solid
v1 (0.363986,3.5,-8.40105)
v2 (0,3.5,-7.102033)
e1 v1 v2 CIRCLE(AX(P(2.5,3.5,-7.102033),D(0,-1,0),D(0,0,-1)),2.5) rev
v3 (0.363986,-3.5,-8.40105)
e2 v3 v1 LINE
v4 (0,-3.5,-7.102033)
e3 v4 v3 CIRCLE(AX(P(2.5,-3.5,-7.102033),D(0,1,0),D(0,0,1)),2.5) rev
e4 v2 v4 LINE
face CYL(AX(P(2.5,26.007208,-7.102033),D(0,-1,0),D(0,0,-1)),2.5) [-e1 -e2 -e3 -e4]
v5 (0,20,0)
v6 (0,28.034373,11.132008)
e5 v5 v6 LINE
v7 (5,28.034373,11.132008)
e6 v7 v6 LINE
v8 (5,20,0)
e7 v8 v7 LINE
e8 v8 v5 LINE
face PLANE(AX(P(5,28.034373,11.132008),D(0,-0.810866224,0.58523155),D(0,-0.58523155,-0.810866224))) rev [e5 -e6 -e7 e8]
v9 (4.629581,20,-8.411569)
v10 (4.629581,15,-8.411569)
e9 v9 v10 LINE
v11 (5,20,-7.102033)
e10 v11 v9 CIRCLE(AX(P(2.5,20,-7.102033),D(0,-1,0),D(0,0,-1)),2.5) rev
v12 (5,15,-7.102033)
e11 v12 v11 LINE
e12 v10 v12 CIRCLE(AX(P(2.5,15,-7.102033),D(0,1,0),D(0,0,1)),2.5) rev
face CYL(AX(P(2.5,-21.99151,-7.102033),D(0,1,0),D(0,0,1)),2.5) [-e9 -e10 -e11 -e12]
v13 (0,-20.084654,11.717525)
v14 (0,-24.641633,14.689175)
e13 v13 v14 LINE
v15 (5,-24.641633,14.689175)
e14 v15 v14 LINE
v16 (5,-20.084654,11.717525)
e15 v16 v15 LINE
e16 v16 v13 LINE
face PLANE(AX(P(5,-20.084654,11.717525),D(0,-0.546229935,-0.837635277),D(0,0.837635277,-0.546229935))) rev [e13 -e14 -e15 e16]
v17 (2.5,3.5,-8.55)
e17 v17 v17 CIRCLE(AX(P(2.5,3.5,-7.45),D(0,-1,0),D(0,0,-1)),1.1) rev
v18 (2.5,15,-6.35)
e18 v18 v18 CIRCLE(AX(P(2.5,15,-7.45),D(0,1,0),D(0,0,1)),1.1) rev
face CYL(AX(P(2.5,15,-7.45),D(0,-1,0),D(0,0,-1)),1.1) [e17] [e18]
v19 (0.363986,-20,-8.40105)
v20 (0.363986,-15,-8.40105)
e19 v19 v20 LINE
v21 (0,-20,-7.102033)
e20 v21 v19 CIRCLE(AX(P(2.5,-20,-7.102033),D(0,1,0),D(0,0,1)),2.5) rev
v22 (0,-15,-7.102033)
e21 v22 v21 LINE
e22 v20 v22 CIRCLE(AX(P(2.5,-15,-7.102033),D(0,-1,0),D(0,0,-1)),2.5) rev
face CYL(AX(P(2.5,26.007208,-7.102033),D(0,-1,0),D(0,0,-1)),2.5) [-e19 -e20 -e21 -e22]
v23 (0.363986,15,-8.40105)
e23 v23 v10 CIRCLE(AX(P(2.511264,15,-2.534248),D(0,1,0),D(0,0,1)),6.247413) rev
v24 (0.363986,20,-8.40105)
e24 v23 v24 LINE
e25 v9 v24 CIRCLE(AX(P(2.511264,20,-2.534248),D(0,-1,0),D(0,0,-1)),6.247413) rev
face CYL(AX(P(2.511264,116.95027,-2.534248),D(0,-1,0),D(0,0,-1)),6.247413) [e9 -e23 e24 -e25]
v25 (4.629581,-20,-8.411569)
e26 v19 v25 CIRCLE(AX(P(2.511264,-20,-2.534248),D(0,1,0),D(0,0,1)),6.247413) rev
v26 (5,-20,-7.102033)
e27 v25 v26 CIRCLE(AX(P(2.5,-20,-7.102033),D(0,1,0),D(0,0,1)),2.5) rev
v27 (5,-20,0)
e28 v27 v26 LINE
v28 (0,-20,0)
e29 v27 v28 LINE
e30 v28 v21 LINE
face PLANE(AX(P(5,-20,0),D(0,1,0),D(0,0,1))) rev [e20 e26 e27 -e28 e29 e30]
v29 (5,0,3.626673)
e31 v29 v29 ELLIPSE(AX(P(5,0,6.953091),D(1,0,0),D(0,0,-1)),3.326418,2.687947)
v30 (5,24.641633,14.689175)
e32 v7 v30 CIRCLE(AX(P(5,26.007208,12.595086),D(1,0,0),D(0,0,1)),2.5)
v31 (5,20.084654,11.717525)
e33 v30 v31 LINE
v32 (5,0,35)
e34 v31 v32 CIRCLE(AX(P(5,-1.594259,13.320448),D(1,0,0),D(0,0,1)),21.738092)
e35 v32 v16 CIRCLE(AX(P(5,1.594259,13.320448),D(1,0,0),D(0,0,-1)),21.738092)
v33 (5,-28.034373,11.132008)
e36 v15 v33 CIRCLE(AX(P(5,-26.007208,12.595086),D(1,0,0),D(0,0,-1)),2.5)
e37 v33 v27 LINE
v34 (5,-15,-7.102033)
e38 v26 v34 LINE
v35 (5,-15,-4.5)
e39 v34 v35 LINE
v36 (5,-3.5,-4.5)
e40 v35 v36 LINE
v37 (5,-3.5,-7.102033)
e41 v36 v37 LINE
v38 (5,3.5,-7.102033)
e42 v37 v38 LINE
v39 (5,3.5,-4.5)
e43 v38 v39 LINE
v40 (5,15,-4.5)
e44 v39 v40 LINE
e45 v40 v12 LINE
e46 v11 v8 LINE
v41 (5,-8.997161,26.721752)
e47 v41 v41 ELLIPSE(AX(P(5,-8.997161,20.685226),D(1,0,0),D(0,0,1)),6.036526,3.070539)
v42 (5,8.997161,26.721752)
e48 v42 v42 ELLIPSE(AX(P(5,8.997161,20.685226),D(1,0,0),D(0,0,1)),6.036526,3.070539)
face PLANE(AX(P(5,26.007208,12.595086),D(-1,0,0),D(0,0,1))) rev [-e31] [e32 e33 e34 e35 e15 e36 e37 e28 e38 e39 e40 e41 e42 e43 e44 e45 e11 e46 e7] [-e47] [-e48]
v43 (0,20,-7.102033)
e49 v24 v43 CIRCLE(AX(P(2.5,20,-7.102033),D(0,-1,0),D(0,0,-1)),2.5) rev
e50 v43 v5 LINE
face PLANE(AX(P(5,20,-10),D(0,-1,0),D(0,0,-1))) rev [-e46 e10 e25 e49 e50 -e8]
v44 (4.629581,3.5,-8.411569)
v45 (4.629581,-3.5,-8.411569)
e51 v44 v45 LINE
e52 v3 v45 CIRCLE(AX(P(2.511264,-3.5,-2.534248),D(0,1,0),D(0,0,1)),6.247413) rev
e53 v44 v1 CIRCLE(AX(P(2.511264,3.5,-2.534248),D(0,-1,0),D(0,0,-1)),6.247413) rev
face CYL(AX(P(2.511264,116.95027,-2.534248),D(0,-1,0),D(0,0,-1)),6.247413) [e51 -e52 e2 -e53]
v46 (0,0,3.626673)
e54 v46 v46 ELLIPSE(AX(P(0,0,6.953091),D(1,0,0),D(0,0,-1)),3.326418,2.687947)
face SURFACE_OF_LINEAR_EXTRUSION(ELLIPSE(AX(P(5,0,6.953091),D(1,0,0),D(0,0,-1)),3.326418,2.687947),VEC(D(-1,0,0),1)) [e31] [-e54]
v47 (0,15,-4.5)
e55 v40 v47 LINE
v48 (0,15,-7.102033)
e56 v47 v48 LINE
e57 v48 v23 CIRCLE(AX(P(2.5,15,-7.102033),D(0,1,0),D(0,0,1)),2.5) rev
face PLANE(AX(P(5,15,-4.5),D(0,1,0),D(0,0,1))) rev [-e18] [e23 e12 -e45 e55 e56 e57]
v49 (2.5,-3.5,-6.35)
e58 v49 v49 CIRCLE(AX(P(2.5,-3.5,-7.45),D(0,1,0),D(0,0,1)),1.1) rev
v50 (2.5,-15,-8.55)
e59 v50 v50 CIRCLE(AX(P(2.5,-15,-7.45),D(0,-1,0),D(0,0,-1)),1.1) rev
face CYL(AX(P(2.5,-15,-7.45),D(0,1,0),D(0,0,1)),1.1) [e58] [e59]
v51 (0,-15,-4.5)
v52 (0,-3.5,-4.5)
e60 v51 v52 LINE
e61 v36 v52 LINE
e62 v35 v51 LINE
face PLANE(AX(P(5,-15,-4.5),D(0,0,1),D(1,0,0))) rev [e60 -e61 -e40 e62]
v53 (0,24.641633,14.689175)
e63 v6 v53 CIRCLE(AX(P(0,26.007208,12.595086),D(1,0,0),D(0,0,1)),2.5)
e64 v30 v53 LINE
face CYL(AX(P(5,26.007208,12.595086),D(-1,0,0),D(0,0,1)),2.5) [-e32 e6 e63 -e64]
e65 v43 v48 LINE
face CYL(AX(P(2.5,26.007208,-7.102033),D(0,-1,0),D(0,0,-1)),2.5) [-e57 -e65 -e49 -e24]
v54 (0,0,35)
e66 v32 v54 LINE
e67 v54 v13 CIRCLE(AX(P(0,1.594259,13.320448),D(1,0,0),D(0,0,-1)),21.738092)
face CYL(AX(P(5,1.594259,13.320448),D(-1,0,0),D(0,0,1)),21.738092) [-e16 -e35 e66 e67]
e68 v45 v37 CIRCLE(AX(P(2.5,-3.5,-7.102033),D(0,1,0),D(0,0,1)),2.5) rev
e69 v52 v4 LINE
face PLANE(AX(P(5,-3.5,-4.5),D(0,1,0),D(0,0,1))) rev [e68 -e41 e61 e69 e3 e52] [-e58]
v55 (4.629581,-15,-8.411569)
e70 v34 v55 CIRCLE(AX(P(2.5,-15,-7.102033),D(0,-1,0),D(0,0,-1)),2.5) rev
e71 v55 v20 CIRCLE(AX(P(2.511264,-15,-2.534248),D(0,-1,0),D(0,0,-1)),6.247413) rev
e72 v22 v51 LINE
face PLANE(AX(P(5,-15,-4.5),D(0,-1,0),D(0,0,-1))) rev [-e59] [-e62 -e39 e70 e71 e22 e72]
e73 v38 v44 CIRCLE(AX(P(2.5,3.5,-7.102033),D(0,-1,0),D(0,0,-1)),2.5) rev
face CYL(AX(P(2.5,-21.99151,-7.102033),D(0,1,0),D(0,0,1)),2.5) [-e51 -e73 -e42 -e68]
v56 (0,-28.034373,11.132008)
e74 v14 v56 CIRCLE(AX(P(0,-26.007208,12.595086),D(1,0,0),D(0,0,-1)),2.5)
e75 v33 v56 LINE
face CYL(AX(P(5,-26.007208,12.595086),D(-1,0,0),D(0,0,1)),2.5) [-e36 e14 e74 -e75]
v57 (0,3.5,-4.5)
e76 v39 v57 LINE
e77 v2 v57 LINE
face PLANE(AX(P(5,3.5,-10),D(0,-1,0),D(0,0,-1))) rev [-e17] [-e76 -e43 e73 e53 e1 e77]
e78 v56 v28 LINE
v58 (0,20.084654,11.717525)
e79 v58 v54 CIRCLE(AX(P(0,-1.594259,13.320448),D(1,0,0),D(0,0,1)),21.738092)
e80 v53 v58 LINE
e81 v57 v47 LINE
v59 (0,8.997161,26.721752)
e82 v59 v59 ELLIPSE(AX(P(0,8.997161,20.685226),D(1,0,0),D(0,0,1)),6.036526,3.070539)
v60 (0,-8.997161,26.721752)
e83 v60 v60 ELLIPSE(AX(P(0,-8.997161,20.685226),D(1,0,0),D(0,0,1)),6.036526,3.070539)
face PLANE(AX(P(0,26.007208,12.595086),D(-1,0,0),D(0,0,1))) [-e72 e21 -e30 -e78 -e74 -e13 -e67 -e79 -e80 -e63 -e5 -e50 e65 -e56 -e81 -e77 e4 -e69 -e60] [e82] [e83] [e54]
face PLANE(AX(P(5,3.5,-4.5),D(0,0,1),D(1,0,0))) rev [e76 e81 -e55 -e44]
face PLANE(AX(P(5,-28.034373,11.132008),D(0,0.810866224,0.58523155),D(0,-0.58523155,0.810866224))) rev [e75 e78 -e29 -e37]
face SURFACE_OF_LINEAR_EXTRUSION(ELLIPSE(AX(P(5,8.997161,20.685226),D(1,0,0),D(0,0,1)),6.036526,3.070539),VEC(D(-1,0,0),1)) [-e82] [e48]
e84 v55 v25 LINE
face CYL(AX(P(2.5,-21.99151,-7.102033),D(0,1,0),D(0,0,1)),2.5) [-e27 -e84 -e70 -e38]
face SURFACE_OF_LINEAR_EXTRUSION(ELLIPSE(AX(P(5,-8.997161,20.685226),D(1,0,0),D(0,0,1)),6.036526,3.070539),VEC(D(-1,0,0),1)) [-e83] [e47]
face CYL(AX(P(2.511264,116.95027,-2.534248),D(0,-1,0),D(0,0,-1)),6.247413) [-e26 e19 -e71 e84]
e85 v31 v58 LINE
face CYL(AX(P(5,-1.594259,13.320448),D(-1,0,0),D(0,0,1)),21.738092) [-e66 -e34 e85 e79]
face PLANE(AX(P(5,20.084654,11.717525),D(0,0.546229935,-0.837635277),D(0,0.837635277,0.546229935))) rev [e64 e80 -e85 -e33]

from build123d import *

# Parameters (mm, degrees)
CROQUIS1_RX                = 6.036526162
CROQUIS1_RY                = 3.070539463
CROQUIS1_RX_2              = 3.326417752
CROQUIS1_RY_2              = 2.687947262
SALIENTE_EXTRUIR2_DEPTH    = 5
CROQUIS7_W                 = 42.690533415
CROQUIS7_H                 = 0.890099334
CORTAR_EXTRUIR1_DEPTH      = 10
REDONDEO1_R                = 2.5
CROQUIS3_R                 = 1.1
SALIENTE_EXTRUIR3_DEPTH    = 11.5
SALIENTE_EXTRUIR4_START    = 11.5
CROQUIS6_R                 = 1.1
SALIENTE_EXTRUIR4_DEPTH    = 11.5
CORTAR_EXTRUIR2_DEPTH      = 61.024571756
CORTAR_EXTRUIR2_DEPTH_BACK = 61.024571756


with BuildPart() as part:
    # Croquis1 → Saliente-Extruir2 (new body)
    with BuildSketch(Plane.YZ):
        with BuildLine():
            Line((20.084653921, 11.717525193), (24.641633022, 14.68917463))
            ThreePointArc((24.641633022, 14.68917463), (27.816291871, 14.320547257), (28.034373421, 11.132007562))
            Line((28.034373421, 11.132007562), (20, 0))
            Line((20, 0), (20, -10))
            Line((20, -10), (15, -10))
            Line((15, -10), (15, -4.5))
            Line((15, -4.5), (3.5, -4.5))
            Line((3.5, -4.5), (3.5, -10))
            Line((3.5, -10), (-3.5, -10))
            Line((-3.5, -10), (-3.5, -4.5))
            Line((-3.5, -4.5), (-15, -4.5))
            Line((-15, -4.5), (-15, -10))
            Line((-15, -10), (-20, -10))
            Line((-20, -10), (-20, 0))
            Line((-20, 0), (-28.034373421, 11.132007562))
            ThreePointArc((-28.034373421, 11.132007562), (-27.816291871, 14.320547257), (-24.641633022, 14.68917463))
            Line((-24.641633022, 14.68917463), (-20.084653921, 11.717525193))
            ThreePointArc((-20.084653921, 11.717525193), (-14.865648019, 27.519606107), (0, 35))
            ThreePointArc((0, 35), (14.865648019, 27.519606107), (20.084653921, 11.717525193))
        make_face()
        with Locations(Location((-8.99716125, 20.68522558), (0, 0, 90))):
            Ellipse(CROQUIS1_RX, CROQUIS1_RY, mode=Mode.SUBTRACT)
        with Locations(Location((0, 6.95309076), (0, 0, -90))):
            Ellipse(CROQUIS1_RX_2, CROQUIS1_RY_2, mode=Mode.SUBTRACT)
        with Locations(Location((8.99716125, 20.68522558), (0, 0, 90))):
            Ellipse(CROQUIS1_RX, CROQUIS1_RY, mode=Mode.SUBTRACT)
    extrude(amount=SALIENTE_EXTRUIR2_DEPTH)

    # Croquis7 → Cortar-Extruir1 (cut)
    with BuildSketch(Plane.YZ):
        with Locations((-0.646243402, -10.047083115)):
            Rectangle(CROQUIS7_W, CROQUIS7_H)
    extrude(amount=CORTAR_EXTRUIR1_DEPTH, mode=Mode.SUBTRACT)

    # Redondeo1
    redondeo1_edges = [part.edges().sort_by_distance(p)[0] for p in [
        (0, 17.5, -9.602033448),
        (5, 17.5, -9.602033448),
        (0, 0, -9.602033448),
        (5, 0, -9.602033448),
        (0, -17.5, -9.602033448),
        (5, -17.5, -9.602033448),
    ]]
    fillet(redondeo1_edges, radius=REDONDEO1_R - 0.0001)  # a hair under: the kernel refuses the full size

    # Croquis3 → Saliente-Extruir3 (add)
    with BuildSketch(Plane(origin=(0, 3.5, 0), x_dir=(-1, 0, 0), z_dir=(0, 1, 0))):
        with Locations(Location((-2.5, -7.45, 0), (0, 0, 270))):
            Circle(CROQUIS3_R)
    extrude(amount=SALIENTE_EXTRUIR3_DEPTH)

    # Croquis6 → Saliente-Extruir4 (add)
    with BuildSketch(Plane.XZ.offset(3.5).offset(SALIENTE_EXTRUIR4_START)):
        with Locations(Location((2.5, -7.45, 0), (0, 0, 270))):
            Circle(CROQUIS6_R)
    extrude(amount=-SALIENTE_EXTRUIR4_DEPTH)

    # Croquis8 → Cortar-Extruir2 (cut, two sides: drawn at the far end of the back side and taken through both)
    with BuildSketch(Plane(origin=(0, 20, 0), x_dir=(-1, 0, 0), z_dir=(0, 1, 0)).offset(-CORTAR_EXTRUIR2_DEPTH_BACK)):
        with BuildLine():
            Line((-74.782541857, 59.609037795), (-6.886174559, -6.99410531))
            ThreePointArc((-6.886174559, -6.99410531), (-2.511263824, -8.781661023), (1.863646912, -6.99410531))
            Line((1.863646912, -6.99410531), (69.76001421, 59.609037795))
            Line((69.76001421, 59.609037795), (69.76001421, -130.610786238))
            Line((69.76001421, -130.610786238), (-74.782541857, -130.610786238))
            Line((-74.782541857, -130.610786238), (-74.782541857, 59.609037795))
        make_face()
    extrude(amount=CORTAR_EXTRUIR2_DEPTH + CORTAR_EXTRUIR2_DEPTH_BACK, mode=Mode.SUBTRACT)


solid = part.part
